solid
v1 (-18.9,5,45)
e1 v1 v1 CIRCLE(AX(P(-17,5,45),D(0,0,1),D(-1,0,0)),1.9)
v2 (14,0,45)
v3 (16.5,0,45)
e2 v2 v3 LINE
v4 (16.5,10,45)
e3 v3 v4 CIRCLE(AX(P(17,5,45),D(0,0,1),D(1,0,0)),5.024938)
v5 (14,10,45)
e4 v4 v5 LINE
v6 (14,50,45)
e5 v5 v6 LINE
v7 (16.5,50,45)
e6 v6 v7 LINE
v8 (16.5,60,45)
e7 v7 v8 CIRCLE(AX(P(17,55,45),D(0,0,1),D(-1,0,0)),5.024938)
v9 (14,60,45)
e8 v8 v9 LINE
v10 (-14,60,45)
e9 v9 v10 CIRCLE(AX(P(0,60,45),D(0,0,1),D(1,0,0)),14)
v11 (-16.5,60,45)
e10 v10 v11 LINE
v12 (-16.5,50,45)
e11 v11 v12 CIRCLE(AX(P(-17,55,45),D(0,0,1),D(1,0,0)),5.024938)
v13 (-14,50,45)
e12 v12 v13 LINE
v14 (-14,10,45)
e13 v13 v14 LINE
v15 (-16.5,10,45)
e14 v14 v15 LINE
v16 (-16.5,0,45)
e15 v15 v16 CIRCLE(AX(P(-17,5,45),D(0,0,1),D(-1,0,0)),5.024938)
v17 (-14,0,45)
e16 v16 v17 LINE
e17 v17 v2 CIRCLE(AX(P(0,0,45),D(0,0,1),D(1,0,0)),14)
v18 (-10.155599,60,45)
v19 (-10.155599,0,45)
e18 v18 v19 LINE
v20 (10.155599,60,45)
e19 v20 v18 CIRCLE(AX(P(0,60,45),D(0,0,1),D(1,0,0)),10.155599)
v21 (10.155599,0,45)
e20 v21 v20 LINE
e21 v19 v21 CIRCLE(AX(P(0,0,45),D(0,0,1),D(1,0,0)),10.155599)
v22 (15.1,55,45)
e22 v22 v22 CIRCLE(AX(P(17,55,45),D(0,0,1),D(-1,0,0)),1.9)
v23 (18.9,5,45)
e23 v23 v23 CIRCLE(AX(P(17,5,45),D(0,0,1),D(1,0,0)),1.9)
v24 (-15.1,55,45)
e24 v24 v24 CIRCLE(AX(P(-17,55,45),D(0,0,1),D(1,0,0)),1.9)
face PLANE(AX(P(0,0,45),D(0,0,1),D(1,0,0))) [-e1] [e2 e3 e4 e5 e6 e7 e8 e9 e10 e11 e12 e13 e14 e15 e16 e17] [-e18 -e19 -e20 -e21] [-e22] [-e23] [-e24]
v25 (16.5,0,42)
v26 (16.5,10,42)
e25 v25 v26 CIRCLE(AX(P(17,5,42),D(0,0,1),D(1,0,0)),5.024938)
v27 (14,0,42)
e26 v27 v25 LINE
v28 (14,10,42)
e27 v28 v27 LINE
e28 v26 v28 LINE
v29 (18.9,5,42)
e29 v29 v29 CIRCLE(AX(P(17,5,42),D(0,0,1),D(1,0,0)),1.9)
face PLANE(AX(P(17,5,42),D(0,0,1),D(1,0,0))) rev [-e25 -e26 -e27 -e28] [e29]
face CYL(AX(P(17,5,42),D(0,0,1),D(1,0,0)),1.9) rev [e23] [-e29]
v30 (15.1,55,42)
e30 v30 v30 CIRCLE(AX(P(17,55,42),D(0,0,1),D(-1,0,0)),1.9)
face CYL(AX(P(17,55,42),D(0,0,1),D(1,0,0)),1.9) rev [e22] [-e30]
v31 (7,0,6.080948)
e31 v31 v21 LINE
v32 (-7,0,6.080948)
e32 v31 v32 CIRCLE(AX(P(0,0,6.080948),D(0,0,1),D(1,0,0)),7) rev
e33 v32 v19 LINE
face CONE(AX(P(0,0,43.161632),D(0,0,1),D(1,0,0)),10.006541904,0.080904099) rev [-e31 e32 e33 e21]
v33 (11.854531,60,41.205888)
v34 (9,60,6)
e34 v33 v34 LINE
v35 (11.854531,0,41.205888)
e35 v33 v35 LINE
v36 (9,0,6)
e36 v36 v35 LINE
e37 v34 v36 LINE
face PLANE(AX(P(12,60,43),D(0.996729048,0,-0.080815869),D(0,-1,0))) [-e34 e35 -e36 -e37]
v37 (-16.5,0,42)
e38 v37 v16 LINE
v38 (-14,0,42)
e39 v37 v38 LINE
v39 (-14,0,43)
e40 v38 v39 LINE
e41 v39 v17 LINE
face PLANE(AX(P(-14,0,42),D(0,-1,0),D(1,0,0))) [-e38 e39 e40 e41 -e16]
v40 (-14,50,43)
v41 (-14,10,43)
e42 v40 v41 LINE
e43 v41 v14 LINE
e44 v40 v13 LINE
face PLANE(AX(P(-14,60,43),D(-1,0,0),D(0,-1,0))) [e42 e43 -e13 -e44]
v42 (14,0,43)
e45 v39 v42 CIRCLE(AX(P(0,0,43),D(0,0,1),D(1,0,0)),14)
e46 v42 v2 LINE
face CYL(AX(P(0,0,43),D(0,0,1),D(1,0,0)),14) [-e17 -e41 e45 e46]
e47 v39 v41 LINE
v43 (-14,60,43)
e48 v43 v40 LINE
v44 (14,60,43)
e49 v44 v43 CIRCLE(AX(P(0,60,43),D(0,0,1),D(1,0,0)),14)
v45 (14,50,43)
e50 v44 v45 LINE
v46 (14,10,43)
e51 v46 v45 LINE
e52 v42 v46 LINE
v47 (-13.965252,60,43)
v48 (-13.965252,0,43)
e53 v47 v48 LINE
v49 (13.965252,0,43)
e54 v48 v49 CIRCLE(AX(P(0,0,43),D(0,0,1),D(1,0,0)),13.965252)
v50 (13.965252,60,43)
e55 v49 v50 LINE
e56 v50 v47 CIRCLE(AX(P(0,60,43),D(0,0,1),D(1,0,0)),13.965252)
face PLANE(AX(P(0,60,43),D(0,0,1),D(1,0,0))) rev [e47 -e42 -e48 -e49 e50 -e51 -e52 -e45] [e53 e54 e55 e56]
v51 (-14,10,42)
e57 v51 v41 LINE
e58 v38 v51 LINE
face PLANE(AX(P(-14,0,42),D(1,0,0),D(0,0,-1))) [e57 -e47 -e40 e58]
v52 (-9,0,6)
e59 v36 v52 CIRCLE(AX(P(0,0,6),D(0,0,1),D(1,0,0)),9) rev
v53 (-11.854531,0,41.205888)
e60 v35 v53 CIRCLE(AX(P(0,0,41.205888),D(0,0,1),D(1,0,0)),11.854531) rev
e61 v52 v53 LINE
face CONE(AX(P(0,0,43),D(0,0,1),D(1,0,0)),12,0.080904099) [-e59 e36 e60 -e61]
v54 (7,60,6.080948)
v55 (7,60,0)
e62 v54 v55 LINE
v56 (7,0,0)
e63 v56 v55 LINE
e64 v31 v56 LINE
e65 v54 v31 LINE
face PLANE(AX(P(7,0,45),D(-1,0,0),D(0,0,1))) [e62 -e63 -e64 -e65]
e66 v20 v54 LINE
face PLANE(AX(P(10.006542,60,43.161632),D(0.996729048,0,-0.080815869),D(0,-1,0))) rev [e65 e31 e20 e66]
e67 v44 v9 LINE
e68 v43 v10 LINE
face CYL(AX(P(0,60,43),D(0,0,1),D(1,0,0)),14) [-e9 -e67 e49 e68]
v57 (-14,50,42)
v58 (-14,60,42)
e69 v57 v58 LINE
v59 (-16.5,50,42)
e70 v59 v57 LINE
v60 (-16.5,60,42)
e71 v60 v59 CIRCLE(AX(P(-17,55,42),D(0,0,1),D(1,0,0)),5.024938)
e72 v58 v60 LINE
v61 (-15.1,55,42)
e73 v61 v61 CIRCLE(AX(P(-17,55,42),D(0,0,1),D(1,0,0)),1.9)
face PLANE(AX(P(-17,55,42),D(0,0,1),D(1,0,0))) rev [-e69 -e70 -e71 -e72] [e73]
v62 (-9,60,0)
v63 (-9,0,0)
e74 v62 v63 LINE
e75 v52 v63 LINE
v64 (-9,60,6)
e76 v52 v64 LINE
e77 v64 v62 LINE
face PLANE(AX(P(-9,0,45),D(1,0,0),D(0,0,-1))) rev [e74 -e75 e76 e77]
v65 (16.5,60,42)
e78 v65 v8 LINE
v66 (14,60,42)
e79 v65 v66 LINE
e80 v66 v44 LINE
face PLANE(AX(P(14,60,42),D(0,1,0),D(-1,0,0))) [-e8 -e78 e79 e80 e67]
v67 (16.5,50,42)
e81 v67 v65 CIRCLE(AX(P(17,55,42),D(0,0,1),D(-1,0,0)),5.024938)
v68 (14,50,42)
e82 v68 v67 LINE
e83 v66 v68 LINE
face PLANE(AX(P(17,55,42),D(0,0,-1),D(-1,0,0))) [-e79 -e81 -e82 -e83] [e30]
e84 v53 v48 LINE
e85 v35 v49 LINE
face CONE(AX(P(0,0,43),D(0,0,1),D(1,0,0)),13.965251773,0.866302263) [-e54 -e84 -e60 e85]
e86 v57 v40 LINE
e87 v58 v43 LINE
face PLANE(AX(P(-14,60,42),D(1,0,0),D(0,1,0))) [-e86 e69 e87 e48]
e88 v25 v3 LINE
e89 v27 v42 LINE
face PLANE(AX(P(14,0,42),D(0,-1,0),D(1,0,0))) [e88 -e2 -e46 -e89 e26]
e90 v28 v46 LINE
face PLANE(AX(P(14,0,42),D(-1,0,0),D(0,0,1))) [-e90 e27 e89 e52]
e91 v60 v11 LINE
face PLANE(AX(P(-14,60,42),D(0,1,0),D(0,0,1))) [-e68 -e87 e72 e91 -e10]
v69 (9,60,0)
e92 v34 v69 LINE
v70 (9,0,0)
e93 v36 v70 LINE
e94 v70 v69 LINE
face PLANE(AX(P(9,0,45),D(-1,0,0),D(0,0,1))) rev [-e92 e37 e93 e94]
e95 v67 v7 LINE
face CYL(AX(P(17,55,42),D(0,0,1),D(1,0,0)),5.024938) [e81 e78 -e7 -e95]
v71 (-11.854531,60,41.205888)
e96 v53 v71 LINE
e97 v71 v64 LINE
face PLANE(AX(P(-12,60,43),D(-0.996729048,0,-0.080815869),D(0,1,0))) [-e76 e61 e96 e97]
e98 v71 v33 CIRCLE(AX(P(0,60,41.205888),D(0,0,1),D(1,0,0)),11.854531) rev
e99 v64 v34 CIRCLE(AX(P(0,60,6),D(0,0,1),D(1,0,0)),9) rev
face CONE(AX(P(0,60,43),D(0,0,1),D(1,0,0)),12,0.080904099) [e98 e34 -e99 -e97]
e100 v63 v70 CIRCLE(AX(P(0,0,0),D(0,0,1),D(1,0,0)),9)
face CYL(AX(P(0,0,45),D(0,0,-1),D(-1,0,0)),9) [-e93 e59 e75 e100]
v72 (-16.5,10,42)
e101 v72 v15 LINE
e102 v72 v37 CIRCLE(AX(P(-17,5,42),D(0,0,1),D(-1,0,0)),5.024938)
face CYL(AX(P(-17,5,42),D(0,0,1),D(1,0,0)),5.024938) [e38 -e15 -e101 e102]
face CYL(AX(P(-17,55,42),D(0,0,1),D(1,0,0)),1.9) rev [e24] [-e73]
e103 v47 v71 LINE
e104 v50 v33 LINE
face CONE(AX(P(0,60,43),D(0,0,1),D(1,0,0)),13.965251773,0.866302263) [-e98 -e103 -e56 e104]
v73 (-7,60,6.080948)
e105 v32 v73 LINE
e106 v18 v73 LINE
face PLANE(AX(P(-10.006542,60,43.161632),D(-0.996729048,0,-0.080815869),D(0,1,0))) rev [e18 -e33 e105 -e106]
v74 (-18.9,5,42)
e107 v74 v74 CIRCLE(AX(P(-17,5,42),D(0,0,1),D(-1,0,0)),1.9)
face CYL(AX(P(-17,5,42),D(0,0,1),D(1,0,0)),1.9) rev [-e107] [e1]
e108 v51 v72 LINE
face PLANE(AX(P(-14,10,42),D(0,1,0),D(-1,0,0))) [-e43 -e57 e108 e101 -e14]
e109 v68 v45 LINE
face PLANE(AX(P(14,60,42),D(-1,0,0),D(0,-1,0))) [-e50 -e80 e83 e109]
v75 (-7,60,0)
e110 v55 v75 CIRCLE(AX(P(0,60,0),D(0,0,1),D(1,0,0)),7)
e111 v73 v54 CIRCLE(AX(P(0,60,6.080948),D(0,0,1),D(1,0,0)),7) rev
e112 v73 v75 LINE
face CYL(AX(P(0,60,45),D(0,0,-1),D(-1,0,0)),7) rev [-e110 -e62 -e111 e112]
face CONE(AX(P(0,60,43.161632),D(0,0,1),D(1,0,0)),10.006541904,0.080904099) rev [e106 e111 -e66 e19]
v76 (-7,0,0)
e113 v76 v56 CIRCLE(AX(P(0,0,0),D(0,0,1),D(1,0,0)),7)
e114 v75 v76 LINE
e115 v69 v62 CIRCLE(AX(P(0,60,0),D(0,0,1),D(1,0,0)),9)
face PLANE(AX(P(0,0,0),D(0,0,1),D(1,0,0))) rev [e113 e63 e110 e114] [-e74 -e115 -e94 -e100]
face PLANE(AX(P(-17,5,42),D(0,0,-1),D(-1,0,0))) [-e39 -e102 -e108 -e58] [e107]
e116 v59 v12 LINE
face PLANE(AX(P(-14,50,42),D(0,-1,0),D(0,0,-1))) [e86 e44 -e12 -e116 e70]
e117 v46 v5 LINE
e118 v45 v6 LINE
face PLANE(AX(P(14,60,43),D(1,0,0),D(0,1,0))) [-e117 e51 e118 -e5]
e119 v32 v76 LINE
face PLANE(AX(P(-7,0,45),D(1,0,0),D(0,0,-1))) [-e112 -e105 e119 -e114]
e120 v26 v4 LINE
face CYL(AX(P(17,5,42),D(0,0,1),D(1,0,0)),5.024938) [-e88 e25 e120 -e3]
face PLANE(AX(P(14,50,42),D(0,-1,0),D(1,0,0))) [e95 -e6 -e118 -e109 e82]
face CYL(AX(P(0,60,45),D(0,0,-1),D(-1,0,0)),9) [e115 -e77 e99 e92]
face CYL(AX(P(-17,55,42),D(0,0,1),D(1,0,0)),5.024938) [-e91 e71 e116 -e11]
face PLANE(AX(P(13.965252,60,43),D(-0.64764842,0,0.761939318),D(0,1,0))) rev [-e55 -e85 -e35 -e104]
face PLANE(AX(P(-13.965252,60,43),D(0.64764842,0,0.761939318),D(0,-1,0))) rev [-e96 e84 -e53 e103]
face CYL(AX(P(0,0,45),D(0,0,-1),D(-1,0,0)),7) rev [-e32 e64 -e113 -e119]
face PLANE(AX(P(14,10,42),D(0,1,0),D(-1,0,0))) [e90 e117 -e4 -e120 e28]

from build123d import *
from OCP.BRepFilletAPI import BRepFilletAPI_MakeChamfer

# Parameters (mm, degrees)
DODANIE_WYCI_GNI_CIE1_DEPTH  = 45
DODANIE_WYCI_GNI_CIE2_DEPTH  = 2
SFAZOWANIE1_SIZE             = 37
SFAZOWANIE1_SIZE2            = 3
SKORUPA4_DEPTH               = 45
SZKIC11_R                    = 1.9
DODANIE_WYCI_GNI_CIE11_DEPTH = 3
SFAZOWANIE6_SIZE             = 1.8
SFAZOWANIE6_SIZE2            = 1.965251773


with BuildPart() as part:
    # Szkic1 → Dodanie-wyciągnięcie1 (new body)
    with BuildSketch(Plane.XY):
        with BuildLine():
            Line((-9, 0), (-9, 60))
            ThreePointArc((-9, 60), (0, 69), (9, 60))
            Line((9, 60), (9, 0))
            ThreePointArc((9, 0), (0, -9), (-9, 0))
        make_face()
    extrude(amount=DODANIE_WYCI_GNI_CIE1_DEPTH)

    # Szkic2 → Dodanie-wyciągnięcie2 (add)
    with BuildSketch(Plane.XY.offset(45)):
        with BuildLine():
            Line((14, 60), (14, 0))
            ThreePointArc((14, 0), (0, -14), (-14, 0))
            Line((-14, 0), (-14, 60))
            ThreePointArc((-14, 60), (0, 74), (14, 60))
        make_face()
    extrude(amount=-DODANIE_WYCI_GNI_CIE2_DEPTH)

    # Sfazowanie1: one chamfer whose edges measure the first distance from different faces: ONE call of the kernel's chamfer builder (chamfer() names one face for all edges)
    sfazowanie1_edges_1 = [part.edges().sort_by_distance(p)[0] for p in [
        (-9, 30, 43),
    ]]
    sfazowanie1_side_1 = [part.faces().sort_by_distance(p)[0] for p in [
        (-9, 30, 21.5),
    ]]
    sfazowanie1_edges_2 = [part.edges().sort_by_distance(p)[0] for p in [
        (0, -9, 43),
    ]]
    sfazowanie1_side_2 = [part.faces().sort_by_distance(p)[0] for p in [
        (0, -9, 21.5),
    ]]
    sfazowanie1_edges_3 = [part.edges().sort_by_distance(p)[0] for p in [
        (9, 30, 43),
    ]]
    sfazowanie1_side_3 = [part.faces().sort_by_distance(p)[0] for p in [
        (9, 30, 21.5),
    ]]
    sfazowanie1_edges_4 = [part.edges().sort_by_distance(p)[0] for p in [
        (0, 69, 43),
    ]]
    sfazowanie1_side_4 = [part.faces().sort_by_distance(p)[0] for p in [
        (0, 69, 21.5),
    ]]
    sfazowanie1 = BRepFilletAPI_MakeChamfer(part.part.solid().wrapped)
    for e in sfazowanie1_edges_1:
        sfazowanie1.Add(SFAZOWANIE1_SIZE, SFAZOWANIE1_SIZE2, e.wrapped, sfazowanie1_side_1[0].wrapped)  # the first distance lies on this face
    for e in sfazowanie1_edges_2:
        sfazowanie1.Add(SFAZOWANIE1_SIZE, SFAZOWANIE1_SIZE2, e.wrapped, sfazowanie1_side_2[0].wrapped)  # the first distance lies on this face
    for e in sfazowanie1_edges_3:
        sfazowanie1.Add(SFAZOWANIE1_SIZE, SFAZOWANIE1_SIZE2, e.wrapped, sfazowanie1_side_3[0].wrapped)  # the first distance lies on this face
    for e in sfazowanie1_edges_4:
        sfazowanie1.Add(SFAZOWANIE1_SIZE, SFAZOWANIE1_SIZE2, e.wrapped, sfazowanie1_side_4[0].wrapped)  # the first distance lies on this face
    add(Compound.cast(sfazowanie1.Shape()), mode=Mode.REPLACE)

    # Skorupa4: read off the stored shape, not the designer's step
    # Skorupa4 outline → Skorupa4 (cut)
    with BuildSketch(Plane.XY):
        with BuildLine():
            ThreePointArc((-7, 0), (0, -7), (7, 0))
            Line((7, 0), (7, 60))
            ThreePointArc((7, 60), (0, 67), (-7, 60))
            Line((-7, 60), (-7, 0))
        make_face()
    extrude(amount=SKORUPA4_DEPTH, mode=Mode.SUBTRACT)

    # Skorupa4 2: loft between two sections, ruled curve by curve
    skorupa4_2_from = [
        Edge.make_three_point_arc((7, 60, 6.080948258), (4.949747468, 64.949747468, 6.080948258), (0, 67, 6.080948258)),
        Edge.make_three_point_arc((0, 67, 6.080948258), (-4.949747468, 64.949747468, 6.080948258), (-7, 60, 6.080948258)),
        Edge.make_three_point_arc((-7, 0, 6.080948258), (-4.949747468, -4.949747468, 6.080948258), (0, -7, 6.080948258)),
        Edge.make_three_point_arc((0, -7, 6.080948258), (4.949747468, -4.949747468, 6.080948258), (7, 0, 6.080948258)),
        Edge.make_line((7, 0, 6.080948258), (7, 60, 6.080948258)),
        Edge.make_line((-7, 60, 6.080948258), (-7, 0, 6.080948258)),
    ]
    skorupa4_2_to = [
        Edge.make_three_point_arc((10.15559879, 60, 45), (7.181092771, 67.181092771, 45), (0, 70.15559879, 45)),
        Edge.make_three_point_arc((0, 70.15559879, 45), (-7.181092771, 67.181092771, 45), (-10.15559879, 60, 45)),
        Edge.make_three_point_arc((-10.15559879, 0, 45), (-7.181092771, -7.181092771, 45), (0, -10.15559879, 45)),
        Edge.make_three_point_arc((0, -10.15559879, 45), (7.181092771, -7.181092771, 45), (10.15559879, 0, 45)),
        Edge.make_line((10.15559879, 0, 45), (10.15559879, 60, 45)),
        Edge.make_line((-10.15559879, 60, 45), (-10.15559879, 0, 45)),
    ]
    skorupa4_2 = Solid(Shell([*[Face.make_surface_from_curves(skorupa4_2_from[k], skorupa4_2_to[k]) for k in range(6)], Face(Wire(skorupa4_2_from)), Face(Wire(skorupa4_2_to))]))
    add(skorupa4_2, mode=Mode.SUBTRACT)

    # Szkic11 → Dodanie-wyciągnięcie11 (add)
    # profile 1 of 4: a face of its own
    with BuildSketch(Plane.XY.offset(45)):
        with BuildLine():
            Line((14, 0), (16.5, 0))
            ThreePointArc((16.5, 0), (22.024937811, 5), (16.5, 10))
            Line((16.5, 10), (14, 10))
            Line((14, 10), (14, 0))
        make_face()
        with Locations((17, 5)):
            Circle(SZKIC11_R, mode=Mode.SUBTRACT)
    # profile 2 of 4: a face of its own
    with BuildSketch(Plane.XY.offset(45)):
        with BuildLine():
            Line((-14, 10), (-16.5, 10))
            ThreePointArc((-16.5, 10), (-22.024937811, 5), (-16.5, 0))
            Line((-16.5, 0), (-14, 0))
            Line((-14, 0), (-14, 10))
        make_face()
        with Locations(Location((-17, 5, 0), (0, 0, 180))):
            Circle(SZKIC11_R, mode=Mode.SUBTRACT)
    # profile 3 of 4: a face of its own
    with BuildSketch(Plane.XY.offset(45)):
        with BuildLine():
            Line((-14, 60), (-16.5, 60))
            ThreePointArc((-16.5, 60), (-22.024937811, 55), (-16.5, 50))
            Line((-16.5, 50), (-14, 50))
            Line((-14, 50), (-14, 60))
        make_face()
        with Locations((-17, 55)):
            Circle(SZKIC11_R, mode=Mode.SUBTRACT)
    # profile 4 of 4: a face of its own
    with BuildSketch(Plane.XY.offset(45)):
        with BuildLine():
            Line((14, 50), (16.5, 50))
            ThreePointArc((16.5, 50), (22.024937811, 55), (16.5, 60))
            Line((16.5, 60), (14, 60))
            Line((14, 60), (14, 50))
        make_face()
        with Locations(Location((17, 55, 0), (0, 0, 180))):
            Circle(SZKIC11_R, mode=Mode.SUBTRACT)
    extrude(amount=-DODANIE_WYCI_GNI_CIE11_DEPTH)

    # Sfazowanie6: one chamfer whose edges measure the first distance from different faces: ONE call of the kernel's chamfer builder (chamfer() names one face for all edges)
    sfazowanie6_edges_1 = [part.edges().sort_by_distance(p)[0] for p in [
        (12, 30, 43),
    ]]
    sfazowanie6_side_1 = [part.faces().sort_by_distance(p)[0] for p in [
        (10.5, 30, 24.5),
    ]]
    sfazowanie6_edges_2 = [part.edges().sort_by_distance(p)[0] for p in [
        (0, 72, 43),
    ]]
    sfazowanie6_side_2 = [part.faces().sort_by_distance(p)[0] for p in [
        (0, 70.5, 24.5),
    ]]
    sfazowanie6_edges_3 = [part.edges().sort_by_distance(p)[0] for p in [
        (0, -12, 43),
    ]]
    sfazowanie6_side_3 = [part.faces().sort_by_distance(p)[0] for p in [
        (0, -10.5, 24.5),
    ]]
    sfazowanie6_edges_4 = [part.edges().sort_by_distance(p)[0] for p in [
        (-12, 30, 43),
    ]]
    sfazowanie6_side_4 = [part.faces().sort_by_distance(p)[0] for p in [
        (-10.5, 30, 24.5),
    ]]
    sfazowanie6 = BRepFilletAPI_MakeChamfer(part.part.solid().wrapped)
    for e in sfazowanie6_edges_1:
        sfazowanie6.Add(SFAZOWANIE6_SIZE, SFAZOWANIE6_SIZE2, e.wrapped, sfazowanie6_side_1[0].wrapped)  # the first distance lies on this face
    for e in sfazowanie6_edges_2:
        sfazowanie6.Add(SFAZOWANIE6_SIZE, SFAZOWANIE6_SIZE2, e.wrapped, sfazowanie6_side_2[0].wrapped)  # the first distance lies on this face
    for e in sfazowanie6_edges_3:
        sfazowanie6.Add(SFAZOWANIE6_SIZE, SFAZOWANIE6_SIZE2, e.wrapped, sfazowanie6_side_3[0].wrapped)  # the first distance lies on this face
    for e in sfazowanie6_edges_4:
        sfazowanie6.Add(SFAZOWANIE6_SIZE, SFAZOWANIE6_SIZE2, e.wrapped, sfazowanie6_side_4[0].wrapped)  # the first distance lies on this face
    add(Compound.cast(sfazowanie6.Shape()), mode=Mode.REPLACE)


solid = part.part
